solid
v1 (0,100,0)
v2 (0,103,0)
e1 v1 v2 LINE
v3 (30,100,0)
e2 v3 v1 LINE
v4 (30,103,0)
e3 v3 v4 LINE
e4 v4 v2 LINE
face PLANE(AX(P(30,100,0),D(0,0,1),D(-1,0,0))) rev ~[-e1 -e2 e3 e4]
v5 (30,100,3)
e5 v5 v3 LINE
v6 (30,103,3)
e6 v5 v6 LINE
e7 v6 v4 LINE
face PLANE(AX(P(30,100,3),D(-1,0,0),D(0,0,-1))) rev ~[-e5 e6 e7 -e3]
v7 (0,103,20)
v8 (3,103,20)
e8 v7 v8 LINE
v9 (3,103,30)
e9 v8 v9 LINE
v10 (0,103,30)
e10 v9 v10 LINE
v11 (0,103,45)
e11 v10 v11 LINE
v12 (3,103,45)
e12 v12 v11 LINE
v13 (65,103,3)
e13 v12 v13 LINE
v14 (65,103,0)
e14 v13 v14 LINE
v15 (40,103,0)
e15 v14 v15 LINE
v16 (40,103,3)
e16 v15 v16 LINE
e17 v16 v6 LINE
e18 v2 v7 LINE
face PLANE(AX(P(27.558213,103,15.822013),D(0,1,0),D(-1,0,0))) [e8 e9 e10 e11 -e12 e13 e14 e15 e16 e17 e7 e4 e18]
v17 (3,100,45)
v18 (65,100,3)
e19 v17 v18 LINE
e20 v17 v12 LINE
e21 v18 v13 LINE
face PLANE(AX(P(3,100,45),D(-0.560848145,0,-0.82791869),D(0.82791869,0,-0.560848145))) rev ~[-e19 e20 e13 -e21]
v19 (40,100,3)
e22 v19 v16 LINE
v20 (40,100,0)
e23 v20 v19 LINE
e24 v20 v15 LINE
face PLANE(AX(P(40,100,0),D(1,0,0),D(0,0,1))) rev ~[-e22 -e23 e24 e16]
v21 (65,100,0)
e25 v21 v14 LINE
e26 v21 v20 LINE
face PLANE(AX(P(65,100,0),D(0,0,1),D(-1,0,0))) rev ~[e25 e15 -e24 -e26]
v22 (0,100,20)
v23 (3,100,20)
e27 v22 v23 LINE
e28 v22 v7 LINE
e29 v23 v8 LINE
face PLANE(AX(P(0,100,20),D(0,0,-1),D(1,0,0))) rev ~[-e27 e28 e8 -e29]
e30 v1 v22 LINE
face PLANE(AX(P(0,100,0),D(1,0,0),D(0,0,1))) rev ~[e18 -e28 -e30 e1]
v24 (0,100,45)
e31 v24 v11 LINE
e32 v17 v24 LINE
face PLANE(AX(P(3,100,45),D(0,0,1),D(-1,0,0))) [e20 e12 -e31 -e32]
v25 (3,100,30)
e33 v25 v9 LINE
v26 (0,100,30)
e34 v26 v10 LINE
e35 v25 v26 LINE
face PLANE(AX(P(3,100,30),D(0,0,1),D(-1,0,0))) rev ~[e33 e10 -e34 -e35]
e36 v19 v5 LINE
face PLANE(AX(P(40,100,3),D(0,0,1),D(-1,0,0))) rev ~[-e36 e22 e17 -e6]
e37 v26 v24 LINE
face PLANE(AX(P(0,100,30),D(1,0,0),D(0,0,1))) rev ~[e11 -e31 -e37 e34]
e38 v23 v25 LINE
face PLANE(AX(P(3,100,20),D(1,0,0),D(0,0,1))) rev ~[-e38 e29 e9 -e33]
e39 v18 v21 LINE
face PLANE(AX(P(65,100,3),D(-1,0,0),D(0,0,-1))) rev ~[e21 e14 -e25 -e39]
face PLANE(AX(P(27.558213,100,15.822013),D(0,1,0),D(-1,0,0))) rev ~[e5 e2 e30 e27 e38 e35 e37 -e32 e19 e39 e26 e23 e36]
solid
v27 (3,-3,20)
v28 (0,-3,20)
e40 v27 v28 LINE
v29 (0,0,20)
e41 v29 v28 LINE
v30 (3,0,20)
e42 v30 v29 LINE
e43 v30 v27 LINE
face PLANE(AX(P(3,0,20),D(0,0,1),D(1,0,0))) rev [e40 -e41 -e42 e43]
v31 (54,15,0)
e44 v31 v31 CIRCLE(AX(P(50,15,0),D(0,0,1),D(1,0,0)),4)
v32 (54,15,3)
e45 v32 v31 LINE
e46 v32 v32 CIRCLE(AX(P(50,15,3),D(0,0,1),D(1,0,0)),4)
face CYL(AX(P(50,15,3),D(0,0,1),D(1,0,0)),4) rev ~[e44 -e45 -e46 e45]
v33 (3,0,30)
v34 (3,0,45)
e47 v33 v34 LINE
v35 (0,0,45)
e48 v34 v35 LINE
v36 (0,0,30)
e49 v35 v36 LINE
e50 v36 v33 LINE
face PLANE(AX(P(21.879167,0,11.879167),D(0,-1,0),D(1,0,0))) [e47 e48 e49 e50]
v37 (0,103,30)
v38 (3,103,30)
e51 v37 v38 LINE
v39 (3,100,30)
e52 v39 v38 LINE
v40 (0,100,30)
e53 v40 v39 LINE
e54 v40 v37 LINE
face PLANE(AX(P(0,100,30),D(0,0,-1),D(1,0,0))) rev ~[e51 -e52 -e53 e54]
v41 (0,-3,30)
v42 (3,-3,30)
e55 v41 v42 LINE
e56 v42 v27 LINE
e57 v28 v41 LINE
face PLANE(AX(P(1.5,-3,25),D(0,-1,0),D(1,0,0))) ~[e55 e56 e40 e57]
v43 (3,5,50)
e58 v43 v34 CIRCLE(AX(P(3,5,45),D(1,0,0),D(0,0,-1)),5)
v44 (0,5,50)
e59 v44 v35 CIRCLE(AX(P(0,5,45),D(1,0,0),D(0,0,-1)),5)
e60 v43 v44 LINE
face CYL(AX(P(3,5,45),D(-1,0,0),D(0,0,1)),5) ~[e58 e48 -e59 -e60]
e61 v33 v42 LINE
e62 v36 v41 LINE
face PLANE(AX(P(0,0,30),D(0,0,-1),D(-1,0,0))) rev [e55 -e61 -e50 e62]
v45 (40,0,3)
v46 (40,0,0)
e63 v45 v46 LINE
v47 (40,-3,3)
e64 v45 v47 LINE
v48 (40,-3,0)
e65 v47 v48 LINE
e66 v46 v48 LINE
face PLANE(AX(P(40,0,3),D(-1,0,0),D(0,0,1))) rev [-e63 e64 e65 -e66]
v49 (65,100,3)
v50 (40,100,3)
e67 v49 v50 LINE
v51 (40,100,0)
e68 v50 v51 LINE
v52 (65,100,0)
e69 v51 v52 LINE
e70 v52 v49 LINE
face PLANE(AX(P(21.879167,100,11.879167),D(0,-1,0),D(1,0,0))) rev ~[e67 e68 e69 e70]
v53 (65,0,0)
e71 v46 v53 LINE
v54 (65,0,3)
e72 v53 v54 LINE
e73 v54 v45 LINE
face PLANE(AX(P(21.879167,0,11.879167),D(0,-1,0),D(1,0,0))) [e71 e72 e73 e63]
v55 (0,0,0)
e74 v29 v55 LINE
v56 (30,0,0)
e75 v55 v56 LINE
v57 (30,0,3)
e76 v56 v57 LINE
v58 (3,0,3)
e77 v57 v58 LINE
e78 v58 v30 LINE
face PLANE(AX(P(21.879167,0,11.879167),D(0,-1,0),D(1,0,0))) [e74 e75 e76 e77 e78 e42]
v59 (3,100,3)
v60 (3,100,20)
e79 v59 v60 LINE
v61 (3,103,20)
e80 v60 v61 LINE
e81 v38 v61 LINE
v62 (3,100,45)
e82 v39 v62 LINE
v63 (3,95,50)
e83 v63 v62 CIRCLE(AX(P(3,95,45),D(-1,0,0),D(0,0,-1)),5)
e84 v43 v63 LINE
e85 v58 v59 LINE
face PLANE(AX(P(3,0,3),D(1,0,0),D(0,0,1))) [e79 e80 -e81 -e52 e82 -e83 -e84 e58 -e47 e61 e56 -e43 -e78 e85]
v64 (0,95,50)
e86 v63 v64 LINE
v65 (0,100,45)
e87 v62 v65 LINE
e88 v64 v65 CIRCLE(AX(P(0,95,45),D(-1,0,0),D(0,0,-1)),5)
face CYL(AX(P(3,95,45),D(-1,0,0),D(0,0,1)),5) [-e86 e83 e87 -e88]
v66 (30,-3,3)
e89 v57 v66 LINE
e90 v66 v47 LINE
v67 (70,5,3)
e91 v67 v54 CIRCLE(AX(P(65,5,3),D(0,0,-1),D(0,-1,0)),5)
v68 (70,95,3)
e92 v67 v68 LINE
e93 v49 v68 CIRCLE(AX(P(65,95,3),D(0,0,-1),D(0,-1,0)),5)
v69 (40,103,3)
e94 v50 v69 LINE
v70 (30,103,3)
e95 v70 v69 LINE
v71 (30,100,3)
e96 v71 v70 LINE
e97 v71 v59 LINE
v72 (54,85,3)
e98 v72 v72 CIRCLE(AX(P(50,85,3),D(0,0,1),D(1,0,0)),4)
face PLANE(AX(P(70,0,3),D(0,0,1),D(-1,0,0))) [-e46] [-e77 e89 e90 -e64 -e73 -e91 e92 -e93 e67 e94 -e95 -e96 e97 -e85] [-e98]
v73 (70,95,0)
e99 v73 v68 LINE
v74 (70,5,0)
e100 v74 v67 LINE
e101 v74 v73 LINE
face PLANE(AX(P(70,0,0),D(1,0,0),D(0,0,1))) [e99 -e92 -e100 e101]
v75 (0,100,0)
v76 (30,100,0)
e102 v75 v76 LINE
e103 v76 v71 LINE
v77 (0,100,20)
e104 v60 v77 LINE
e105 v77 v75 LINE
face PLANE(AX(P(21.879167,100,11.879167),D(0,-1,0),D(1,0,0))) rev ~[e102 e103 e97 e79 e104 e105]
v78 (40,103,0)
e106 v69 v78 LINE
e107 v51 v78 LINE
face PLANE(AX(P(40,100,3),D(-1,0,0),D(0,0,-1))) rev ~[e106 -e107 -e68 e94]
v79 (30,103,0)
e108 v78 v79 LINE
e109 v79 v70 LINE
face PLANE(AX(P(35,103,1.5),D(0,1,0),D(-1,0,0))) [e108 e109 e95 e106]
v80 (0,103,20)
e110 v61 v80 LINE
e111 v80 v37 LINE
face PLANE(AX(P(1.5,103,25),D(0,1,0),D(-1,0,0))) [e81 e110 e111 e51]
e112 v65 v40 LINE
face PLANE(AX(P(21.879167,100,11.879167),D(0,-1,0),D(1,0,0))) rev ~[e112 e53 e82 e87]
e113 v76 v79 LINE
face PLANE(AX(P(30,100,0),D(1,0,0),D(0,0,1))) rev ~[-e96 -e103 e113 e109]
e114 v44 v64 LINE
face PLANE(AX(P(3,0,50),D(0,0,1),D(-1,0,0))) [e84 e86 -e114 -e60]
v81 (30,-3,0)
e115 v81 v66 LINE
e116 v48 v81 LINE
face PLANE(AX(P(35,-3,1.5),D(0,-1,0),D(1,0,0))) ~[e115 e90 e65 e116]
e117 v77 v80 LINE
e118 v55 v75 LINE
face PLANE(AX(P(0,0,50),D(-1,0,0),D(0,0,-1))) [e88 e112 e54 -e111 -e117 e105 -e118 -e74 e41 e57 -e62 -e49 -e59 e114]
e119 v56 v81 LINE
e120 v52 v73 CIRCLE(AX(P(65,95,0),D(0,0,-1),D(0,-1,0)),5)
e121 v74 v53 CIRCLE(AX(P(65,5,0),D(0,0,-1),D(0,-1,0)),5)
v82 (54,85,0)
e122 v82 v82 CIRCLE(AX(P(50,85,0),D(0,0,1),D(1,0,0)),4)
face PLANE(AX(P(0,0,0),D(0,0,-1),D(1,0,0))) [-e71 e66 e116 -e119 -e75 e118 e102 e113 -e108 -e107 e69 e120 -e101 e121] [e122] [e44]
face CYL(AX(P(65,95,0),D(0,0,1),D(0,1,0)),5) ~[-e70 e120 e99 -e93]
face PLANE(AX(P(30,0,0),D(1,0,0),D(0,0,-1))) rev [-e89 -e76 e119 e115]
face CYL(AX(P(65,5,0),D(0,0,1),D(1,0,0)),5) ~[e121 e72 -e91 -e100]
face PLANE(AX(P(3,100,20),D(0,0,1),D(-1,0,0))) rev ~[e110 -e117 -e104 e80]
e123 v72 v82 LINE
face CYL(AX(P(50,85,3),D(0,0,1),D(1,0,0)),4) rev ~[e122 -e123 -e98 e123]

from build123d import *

# Parameters (mm, degrees)
F1_DEPTH = 100
F2_R     = 4
F3_DEPTH = 25
F5_DEPTH = 3
F7_R     = 5
F8_W     = 3
F8_H     = 15
F9_DEPTH = 3


# Not quite as in the source:
# - a pattern or mirror of a feature is missing from the dataset's text; its kind, count and spacing are read off the source's solid


with BuildPart() as f1:
    # F0 (on Front) → F1 (new body)
    with BuildSketch(Plane.XZ):
        Polygon((0, 50), (0, 0), (70, 0), (70, 3), (3, 3), (3, 50), align=None)
    extrude(amount=-F1_DEPTH)

    # F2 (on face) → F3 (cut)
    with BuildSketch(Plane.XY.offset(3)):
        with Locations((50, 85)):
            Circle(F2_R)
        with Locations((50, 15)):
            Circle(F2_R)
    extrude(amount=-F3_DEPTH, mode=Mode.SUBTRACT)

    # F4 (on face) → F5 (join)
    with BuildSketch(Plane(origin=(0, 100, 0), x_dir=(-1, 0, 0), z_dir=(0, 1, 0))):
        Polygon((-3, 20), (0, 20), (0, 25), (0, 30), (-3, 30), align=None)
        Polygon((-35, 0), (-30, 0), (-30, 3), (-40, 3), (-40, 0), align=None)
    f5 = extrude(amount=F5_DEPTH)

    # F5_copies: F5 across plane
    add(f5.mirror(Plane(origin=(0, 50, 0), x_dir=(0, 0, -1), z_dir=(0, -1, 0))))

    # F7
    f7_edges = [f1.edges().sort_by_distance(p)[0] for p in [
        (1.5, 100, 50),
        (1.5, 0, 50),
        (70, 100, 1.5),
        (70, 0, 1.5),
    ]]
    fillet(f7_edges, radius=F7_R)


with BuildPart() as f9:
    # F8 (on face) → F9 (new body)
    with BuildSketch(Plane(origin=(0, 100, 0), x_dir=(-1, 0, 0), z_dir=(0, 1, 0))):
        Polygon((-3, 20), (-3, 30), (-3, 45), (-65, 3), (-65, 0), (-40, 0), (-40, 3), (-30, 3), (-3, 3), align=None)
        Polygon((0, 20), (-3, 20), (-3, 3), (-30, 3), (-30, 0), (0, 0), align=None)
        with Locations((-1.5, 37.5)):
            Rectangle(F8_W, F8_H)
    extrude(amount=F9_DEPTH)


solid = Compound([f1.part, f9.part])
